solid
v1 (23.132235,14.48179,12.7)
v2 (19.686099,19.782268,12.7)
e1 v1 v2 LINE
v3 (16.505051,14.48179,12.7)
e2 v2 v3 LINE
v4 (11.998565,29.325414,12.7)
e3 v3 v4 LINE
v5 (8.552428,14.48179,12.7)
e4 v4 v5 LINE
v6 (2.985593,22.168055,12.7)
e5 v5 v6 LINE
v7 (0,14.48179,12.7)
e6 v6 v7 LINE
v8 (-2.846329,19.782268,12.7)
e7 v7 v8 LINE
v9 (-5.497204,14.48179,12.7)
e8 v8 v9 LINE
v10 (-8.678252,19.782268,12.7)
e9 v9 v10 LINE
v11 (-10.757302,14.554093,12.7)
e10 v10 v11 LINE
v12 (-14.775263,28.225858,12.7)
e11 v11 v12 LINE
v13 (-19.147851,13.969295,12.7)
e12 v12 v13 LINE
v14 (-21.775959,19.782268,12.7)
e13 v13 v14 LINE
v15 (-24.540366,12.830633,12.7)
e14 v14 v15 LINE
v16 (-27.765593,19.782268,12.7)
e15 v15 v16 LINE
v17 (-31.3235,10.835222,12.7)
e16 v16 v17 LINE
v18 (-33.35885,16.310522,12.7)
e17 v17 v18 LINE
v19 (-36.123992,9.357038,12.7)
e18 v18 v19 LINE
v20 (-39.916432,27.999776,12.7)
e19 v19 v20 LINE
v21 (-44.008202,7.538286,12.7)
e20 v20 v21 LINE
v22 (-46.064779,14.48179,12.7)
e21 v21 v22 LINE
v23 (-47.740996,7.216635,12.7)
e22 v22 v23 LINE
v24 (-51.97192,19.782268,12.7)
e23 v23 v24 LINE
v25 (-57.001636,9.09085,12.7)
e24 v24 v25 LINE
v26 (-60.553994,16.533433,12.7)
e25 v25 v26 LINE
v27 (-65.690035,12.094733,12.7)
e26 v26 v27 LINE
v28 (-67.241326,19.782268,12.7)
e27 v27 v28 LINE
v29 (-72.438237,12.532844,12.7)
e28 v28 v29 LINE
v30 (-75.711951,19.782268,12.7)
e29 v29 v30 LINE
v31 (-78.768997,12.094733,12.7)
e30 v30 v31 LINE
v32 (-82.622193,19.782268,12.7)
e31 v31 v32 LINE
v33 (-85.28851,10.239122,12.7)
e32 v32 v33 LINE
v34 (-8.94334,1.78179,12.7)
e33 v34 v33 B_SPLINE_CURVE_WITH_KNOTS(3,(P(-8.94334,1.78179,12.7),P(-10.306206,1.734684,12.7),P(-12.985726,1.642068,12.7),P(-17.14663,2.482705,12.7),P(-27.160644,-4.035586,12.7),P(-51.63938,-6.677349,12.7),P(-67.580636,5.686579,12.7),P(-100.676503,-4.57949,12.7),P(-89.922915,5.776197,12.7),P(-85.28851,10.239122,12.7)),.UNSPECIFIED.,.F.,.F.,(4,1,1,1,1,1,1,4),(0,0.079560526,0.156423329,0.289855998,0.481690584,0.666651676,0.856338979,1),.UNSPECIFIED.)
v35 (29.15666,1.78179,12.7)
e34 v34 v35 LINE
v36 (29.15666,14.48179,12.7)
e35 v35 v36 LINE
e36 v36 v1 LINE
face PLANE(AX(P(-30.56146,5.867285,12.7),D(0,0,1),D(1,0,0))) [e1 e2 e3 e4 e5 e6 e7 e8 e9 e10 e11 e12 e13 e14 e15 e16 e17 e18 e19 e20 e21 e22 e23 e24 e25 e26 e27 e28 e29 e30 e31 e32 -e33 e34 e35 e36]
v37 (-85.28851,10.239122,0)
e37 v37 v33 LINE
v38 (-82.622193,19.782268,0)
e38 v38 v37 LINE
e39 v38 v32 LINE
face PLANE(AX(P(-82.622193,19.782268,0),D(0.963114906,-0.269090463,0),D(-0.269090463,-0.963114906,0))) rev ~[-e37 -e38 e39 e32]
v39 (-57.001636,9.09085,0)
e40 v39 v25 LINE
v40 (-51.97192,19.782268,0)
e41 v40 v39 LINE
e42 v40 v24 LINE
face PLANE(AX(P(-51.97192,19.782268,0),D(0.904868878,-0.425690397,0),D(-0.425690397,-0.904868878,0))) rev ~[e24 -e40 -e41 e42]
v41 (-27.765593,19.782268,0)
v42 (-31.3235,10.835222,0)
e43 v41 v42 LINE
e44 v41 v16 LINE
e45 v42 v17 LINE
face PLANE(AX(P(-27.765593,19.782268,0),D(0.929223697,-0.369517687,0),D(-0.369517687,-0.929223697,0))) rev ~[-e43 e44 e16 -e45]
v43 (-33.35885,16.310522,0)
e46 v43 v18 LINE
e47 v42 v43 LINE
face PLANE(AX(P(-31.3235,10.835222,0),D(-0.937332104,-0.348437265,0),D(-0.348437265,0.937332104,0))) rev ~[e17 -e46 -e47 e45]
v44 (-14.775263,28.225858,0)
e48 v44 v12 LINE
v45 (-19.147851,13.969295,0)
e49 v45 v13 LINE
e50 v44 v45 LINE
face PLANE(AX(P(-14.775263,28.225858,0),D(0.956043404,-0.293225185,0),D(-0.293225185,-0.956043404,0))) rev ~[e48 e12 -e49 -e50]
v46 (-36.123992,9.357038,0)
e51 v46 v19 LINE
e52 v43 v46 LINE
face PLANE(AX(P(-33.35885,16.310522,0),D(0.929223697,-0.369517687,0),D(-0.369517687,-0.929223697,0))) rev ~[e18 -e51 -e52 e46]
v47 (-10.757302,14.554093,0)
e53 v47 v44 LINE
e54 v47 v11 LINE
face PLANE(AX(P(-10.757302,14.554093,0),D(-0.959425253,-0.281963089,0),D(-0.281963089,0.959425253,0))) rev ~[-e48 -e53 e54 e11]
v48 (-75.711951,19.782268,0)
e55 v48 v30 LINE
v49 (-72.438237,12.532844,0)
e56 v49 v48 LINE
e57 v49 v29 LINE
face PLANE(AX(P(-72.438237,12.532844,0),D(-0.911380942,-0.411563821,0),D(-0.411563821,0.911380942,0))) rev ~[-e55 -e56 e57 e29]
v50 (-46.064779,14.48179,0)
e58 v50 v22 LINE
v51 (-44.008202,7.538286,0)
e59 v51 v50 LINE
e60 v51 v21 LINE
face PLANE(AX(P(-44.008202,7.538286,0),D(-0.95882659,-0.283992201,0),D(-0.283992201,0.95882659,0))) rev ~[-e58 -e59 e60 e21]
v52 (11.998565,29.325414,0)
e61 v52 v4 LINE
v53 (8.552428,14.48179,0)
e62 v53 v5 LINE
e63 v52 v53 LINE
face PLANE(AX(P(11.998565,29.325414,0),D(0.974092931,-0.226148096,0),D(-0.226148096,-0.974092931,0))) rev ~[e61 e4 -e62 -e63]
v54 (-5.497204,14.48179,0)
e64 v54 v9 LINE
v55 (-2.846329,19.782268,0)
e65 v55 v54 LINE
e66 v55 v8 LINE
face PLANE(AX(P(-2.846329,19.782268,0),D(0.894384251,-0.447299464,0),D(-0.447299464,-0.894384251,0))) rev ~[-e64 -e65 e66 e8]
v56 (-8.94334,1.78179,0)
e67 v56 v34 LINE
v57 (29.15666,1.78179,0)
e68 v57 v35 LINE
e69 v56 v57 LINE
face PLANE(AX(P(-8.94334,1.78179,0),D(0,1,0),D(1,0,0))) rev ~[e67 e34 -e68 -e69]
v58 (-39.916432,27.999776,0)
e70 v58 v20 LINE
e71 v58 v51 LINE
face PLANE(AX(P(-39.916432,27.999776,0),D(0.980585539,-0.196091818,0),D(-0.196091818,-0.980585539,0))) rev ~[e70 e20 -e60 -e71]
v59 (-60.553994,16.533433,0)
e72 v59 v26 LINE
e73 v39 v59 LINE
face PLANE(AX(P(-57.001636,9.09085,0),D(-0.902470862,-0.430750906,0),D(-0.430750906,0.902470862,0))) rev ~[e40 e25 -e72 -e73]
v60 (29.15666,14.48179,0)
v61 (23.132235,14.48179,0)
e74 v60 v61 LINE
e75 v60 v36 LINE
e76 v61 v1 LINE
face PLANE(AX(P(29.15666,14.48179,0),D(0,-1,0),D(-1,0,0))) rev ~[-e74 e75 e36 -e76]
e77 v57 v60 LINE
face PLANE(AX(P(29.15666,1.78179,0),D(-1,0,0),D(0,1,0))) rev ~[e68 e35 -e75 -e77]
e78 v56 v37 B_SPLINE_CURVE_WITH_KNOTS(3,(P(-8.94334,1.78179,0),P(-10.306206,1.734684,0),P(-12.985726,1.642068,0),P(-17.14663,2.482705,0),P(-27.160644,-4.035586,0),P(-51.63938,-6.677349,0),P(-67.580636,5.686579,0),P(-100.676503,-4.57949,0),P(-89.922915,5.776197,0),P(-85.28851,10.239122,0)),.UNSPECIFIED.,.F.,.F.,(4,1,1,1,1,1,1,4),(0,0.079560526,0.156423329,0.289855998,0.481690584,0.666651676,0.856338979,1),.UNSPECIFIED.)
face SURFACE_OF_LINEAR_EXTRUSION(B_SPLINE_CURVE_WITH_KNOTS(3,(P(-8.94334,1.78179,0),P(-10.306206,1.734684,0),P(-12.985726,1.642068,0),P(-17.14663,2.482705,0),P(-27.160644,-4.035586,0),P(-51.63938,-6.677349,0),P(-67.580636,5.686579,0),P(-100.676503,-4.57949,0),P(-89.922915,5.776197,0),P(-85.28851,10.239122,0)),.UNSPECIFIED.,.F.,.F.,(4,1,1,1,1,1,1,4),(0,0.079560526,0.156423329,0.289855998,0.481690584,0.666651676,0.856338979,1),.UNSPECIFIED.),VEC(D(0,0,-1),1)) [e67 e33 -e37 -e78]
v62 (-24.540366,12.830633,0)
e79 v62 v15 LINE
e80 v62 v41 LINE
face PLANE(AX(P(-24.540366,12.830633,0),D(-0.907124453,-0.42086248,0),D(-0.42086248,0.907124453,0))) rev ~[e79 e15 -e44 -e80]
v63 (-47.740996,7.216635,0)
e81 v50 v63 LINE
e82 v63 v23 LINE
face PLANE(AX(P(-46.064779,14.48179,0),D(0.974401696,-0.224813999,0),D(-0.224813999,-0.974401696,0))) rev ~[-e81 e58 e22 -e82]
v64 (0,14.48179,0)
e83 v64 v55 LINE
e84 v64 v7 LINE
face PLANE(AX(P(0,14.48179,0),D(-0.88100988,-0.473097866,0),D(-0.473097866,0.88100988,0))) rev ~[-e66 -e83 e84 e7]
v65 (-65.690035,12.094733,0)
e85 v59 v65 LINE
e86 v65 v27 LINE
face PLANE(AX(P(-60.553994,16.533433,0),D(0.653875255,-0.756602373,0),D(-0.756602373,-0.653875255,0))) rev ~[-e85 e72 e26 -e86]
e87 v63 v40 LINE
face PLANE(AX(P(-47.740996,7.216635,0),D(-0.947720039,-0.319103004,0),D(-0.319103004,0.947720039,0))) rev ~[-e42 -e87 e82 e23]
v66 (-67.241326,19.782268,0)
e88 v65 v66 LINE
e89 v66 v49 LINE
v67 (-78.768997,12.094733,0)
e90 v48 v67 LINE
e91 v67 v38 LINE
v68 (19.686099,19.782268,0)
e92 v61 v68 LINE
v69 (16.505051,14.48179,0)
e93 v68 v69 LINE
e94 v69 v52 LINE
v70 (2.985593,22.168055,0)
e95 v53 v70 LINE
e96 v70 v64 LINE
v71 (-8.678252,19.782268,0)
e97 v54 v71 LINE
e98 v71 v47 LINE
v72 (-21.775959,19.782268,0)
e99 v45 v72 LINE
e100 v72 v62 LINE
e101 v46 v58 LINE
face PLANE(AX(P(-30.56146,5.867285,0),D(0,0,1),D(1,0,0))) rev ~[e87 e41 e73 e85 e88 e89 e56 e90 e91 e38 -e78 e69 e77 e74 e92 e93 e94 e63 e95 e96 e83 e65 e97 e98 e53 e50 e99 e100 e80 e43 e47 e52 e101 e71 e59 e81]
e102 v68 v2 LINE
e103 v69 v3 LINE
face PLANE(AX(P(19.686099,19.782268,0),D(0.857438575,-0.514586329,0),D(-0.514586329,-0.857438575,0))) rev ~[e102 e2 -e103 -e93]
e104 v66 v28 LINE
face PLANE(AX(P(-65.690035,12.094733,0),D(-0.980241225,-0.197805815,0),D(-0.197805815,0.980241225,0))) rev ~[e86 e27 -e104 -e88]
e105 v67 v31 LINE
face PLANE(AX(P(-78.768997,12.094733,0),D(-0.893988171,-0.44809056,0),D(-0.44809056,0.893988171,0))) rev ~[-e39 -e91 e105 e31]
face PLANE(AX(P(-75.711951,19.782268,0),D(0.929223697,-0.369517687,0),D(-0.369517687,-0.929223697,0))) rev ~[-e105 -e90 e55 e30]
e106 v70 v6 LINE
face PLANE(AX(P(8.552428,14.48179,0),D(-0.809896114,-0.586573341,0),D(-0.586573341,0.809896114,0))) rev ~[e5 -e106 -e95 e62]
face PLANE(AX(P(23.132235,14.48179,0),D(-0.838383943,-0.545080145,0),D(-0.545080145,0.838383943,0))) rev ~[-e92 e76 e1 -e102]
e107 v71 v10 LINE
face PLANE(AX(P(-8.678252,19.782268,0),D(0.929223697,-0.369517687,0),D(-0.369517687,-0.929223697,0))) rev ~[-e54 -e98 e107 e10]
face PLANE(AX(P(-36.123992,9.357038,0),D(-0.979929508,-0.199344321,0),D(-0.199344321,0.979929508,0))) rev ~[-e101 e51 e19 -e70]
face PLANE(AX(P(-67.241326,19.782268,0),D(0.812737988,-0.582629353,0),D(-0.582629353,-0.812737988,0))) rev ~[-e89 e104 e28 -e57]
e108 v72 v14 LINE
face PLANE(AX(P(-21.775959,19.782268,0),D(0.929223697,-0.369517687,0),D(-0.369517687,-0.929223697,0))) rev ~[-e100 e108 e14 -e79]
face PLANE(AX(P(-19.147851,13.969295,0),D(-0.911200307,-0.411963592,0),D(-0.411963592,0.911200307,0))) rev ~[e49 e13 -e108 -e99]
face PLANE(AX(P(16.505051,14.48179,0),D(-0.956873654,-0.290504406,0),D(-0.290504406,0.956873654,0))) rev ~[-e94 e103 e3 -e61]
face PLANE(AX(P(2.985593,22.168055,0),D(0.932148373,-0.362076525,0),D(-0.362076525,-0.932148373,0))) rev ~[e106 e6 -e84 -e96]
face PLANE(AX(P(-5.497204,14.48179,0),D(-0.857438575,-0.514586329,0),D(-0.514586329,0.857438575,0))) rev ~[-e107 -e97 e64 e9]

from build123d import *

# Parameters (mm, degrees)
F1_DEPTH = 12.7


# Not quite as in the source:
# - a feature names something its author has since deleted; it is built from what else it names


with BuildPart() as f1:
    # F0 (on Top) → F1 (new body)
    with BuildSketch(Plane.XY):
        with BuildLine():
            Line((29.1566601902, 1.7817904405), (29.1566601902, 14.4817904405))
            Line((29.1566601902, 14.4817904405), (23.1322348118, 14.4817904405))
            Line((23.1322348118, 14.4817904405), (16.5050514042, 14.4817904405))
            Line((16.5050514042, 14.4817904405), (8.552428335, 14.4817904405))
            Line((8.552428335, 14.4817904405), (0, 14.4817904405))
            Line((0, 14.4817904405), (-5.4972041398, 14.4817904405))
            Line((-5.4972041398, 14.4817904405), (-8.9433398098, 14.4817904405))
            add(Edge.make_bspline(
                [(-8.9433398098, 14.4817904405), (-10.7573023584, 14.5540929372), (-13.6536245903, 14.6695370673), (-17.5443018447, 14.2319983354), (-19.1478505954, 13.9692945078)],
                knots=[0, 0, 0, 0, 0.1219531365, 0.1947204372, 0.1947204372, 0.1947204372, 0.1947204372], degree=3))
            add(Edge.make_bspline(
                [(-19.1478505954, 13.9692945078), (-20.7855145388, 13.7010017066), (-22.5792086961, 13.3292483099), (-24.5403655562, 12.8306326712)],
                knots=[0.1947204372, 0.1947204372, 0.1947204372, 0.1947204372, 0.2690358483, 0.2690358483, 0.2690358483, 0.2690358483], degree=3))
            add(Edge.make_bspline(
                [(-24.5403655562, 12.8306326712), (-25.4054556528, 12.6106872606), (-27.5608275588, 12.0233152228), (-29.9097113738, 11.2820530364), (-31.3234997305, 10.8352217448)],
                knots=[0.2690358483, 0.2690358483, 0.2690358483, 0.2690358483, 0.3018172782, 0.3477460441, 0.3477460441, 0.3477460441, 0.3477460441], degree=3))
            add(Edge.make_bspline(
                [(-31.3234997305, 10.8352217448), (-32.8813721767, 10.3428523218), (-34.4916669077, 9.8331294404), (-36.1239915531, 9.3570380081)],
                knots=[0.3477460441, 0.3477460441, 0.3477460441, 0.3477460441, 0.3983555703, 0.3983555703, 0.3983555703, 0.3983555703], degree=3))
            add(Edge.make_bspline(
                [(-36.1239915531, 9.3570380081), (-38.7371673177, 8.5948669557), (-41.406802576, 7.9188884572), (-44.0082018162, 7.5382862352)],
                knots=[0.3983555703, 0.3983555703, 0.3983555703, 0.3983555703, 0.4793759651, 0.4793759651, 0.4793759651, 0.4793759651], degree=3))
            add(Edge.make_bspline(
                [(-44.0082018162, 7.5382862352), (-45.2733883847, 7.3531809228), (-46.5224347573, 7.2379423921), (-47.7409961664, 7.2166347961)],
                knots=[0.4793759651, 0.4793759651, 0.4793759651, 0.4793759651, 0.518780111, 0.518780111, 0.518780111, 0.518780111], degree=3))
            add(Edge.make_bspline(
                [(-47.7409961664, 7.2166347961), (-48.61023628, 7.2014353839), (-51.8736517816, 7.3260381182), (-54.8343256873, 8.2766625789), (-57.0016363215, 9.090849647)],
                knots=[0.518780111, 0.518780111, 0.518780111, 0.518780111, 0.5468883902, 0.6262253297, 0.6262253297, 0.6262253297, 0.6262253297], degree=3))
            add(Edge.make_bspline(
                [(-57.0016363215, 9.090849647), (-59.8222284032, 10.150452992), (-62.6109209229, 11.4001772385), (-65.6900354035, 12.0947333053)],
                knots=[0.6262253297, 0.6262253297, 0.6262253297, 0.6262253297, 0.7294764002, 0.7294764002, 0.7294764002, 0.7294764002], degree=3))
            add(Edge.make_bspline(
                [(-65.6900354035, 12.0947333053), (-67.0336130762, 12.397804214), (-69.2092078019, 12.7047556683), (-71.5833285763, 12.6062540598), (-72.4382368268, 12.5328440974)],
                knots=[0.7294764002, 0.7294764002, 0.7294764002, 0.7294764002, 0.7745302084, 0.7995461596, 0.7995461596, 0.7995461596, 0.7995461596], degree=3))
            add(Edge.make_bspline(
                [(-72.4382368268, 12.5328440974), (-78.4000977285, 12.0209061386), (-85.6590909795, 9.2956107983), (-85.3310582144, 10.1307918098), (-85.2885097265, 10.2391215041)],
                knots=[0.7995461596, 0.7995461596, 0.7995461596, 0.7995461596, 0.9739995247, 1, 1, 1, 1], degree=3))
            add(Edge.make_bspline(
                [(-8.9433398098, 1.7817904405), (-10.3062057468, 1.7346839959), (-12.9857258176, 1.6420683833), (-17.1466296289, 2.4827049446), (-27.1606442527, -4.0355858357), (-51.6393795509, -6.6773487114), (-67.5806364014, 5.6865791664), (-100.6765031612, -4.5794896544), (-89.9229154748, 5.7761967552), (-85.2885097265, 10.2391215041)],
                knots=[0, 0, 0, 0, 0.0795605261, 0.1564233287, 0.2898559981, 0.4816905838, 0.6666516763, 0.8563389789, 1, 1, 1, 1], degree=3))
            Line((-8.9433398098, 1.7817904405), (29.1566601902, 1.7817904405))
        make_face()
        with BuildLine():
            Line((-82.6221928, 19.7822675109), (-85.2885097265, 10.2391215041))
            add(Edge.make_bspline(
                [(-72.4382368268, 12.5328440974), (-78.4000977285, 12.0209061386), (-85.6590909795, 9.2956107983), (-85.3310582144, 10.1307918098), (-85.2885097265, 10.2391215041)],
                knots=[0.7995461596, 0.7995461596, 0.7995461596, 0.7995461596, 0.9739995247, 1, 1, 1, 1], degree=3))
            Line((-72.4382368268, 12.5328440974), (-75.7119506598, 19.7822675109))
            Line((-75.7119506598, 19.7822675109), (-78.7689969505, 12.0947333053))
            Line((-78.7689969505, 12.0947333053), (-82.6221928, 19.7822675109))
        make_face()
        with BuildLine():
            Line((-67.2413259745, 19.7822675109), (-72.4382368268, 12.5328440974))
            add(Edge.make_bspline(
                [(-65.6900354035, 12.0947333053), (-67.0336130762, 12.397804214), (-69.2092078019, 12.7047556683), (-71.5833285763, 12.6062540598), (-72.4382368268, 12.5328440974)],
                knots=[0.7294764002, 0.7294764002, 0.7294764002, 0.7294764002, 0.7745302084, 0.7995461596, 0.7995461596, 0.7995461596, 0.7995461596], degree=3))
            Line((-65.6900354035, 12.0947333053), (-67.2413259745, 19.7822675109))
        make_face()
        with BuildLine():
            Line((-51.9719198346, 19.7822675109), (-57.0016363215, 9.090849647))
            add(Edge.make_bspline(
                [(-47.7409961664, 7.2166347961), (-48.61023628, 7.2014353839), (-51.8736517816, 7.3260381182), (-54.8343256873, 8.2766625789), (-57.0016363215, 9.090849647)],
                knots=[0.518780111, 0.518780111, 0.518780111, 0.518780111, 0.5468883902, 0.6262253297, 0.6262253297, 0.6262253297, 0.6262253297], degree=3))
            Line((-47.7409961664, 7.2166347961), (-51.9719198346, 19.7822675109))
        make_face()
        with BuildLine():
            Line((-46.0647791624, 14.4817904405), (-47.7409961664, 7.2166347961))
            add(Edge.make_bspline(
                [(-44.0082018162, 7.5382862352), (-45.2733883847, 7.3531809228), (-46.5224347573, 7.2379423921), (-47.7409961664, 7.2166347961)],
                knots=[0.4793759651, 0.4793759651, 0.4793759651, 0.4793759651, 0.518780111, 0.518780111, 0.518780111, 0.518780111], degree=3))
            Line((-44.0082018162, 7.5382862352), (-46.0647791624, 14.4817904405))
        make_face()
        with BuildLine():
            Line((-39.9164316104, 27.9997758427), (-44.0082018162, 7.5382862352))
            add(Edge.make_bspline(
                [(-36.1239915531, 9.3570380081), (-38.7371673177, 8.5948669557), (-41.406802576, 7.9188884572), (-44.0082018162, 7.5382862352)],
                knots=[0.3983555703, 0.3983555703, 0.3983555703, 0.3983555703, 0.4793759651, 0.4793759651, 0.4793759651, 0.4793759651], degree=3))
            Line((-36.1239915531, 9.3570380081), (-39.9164316104, 27.9997758427))
        make_face()
        with BuildLine():
            Line((-33.3588495851, 16.3105223328), (-36.1239915531, 9.3570380081))
            add(Edge.make_bspline(
                [(-31.3234997305, 10.8352217448), (-32.8813721767, 10.3428523218), (-34.4916669077, 9.8331294404), (-36.1239915531, 9.3570380081)],
                knots=[0.3477460441, 0.3477460441, 0.3477460441, 0.3477460441, 0.3983555703, 0.3983555703, 0.3983555703, 0.3983555703], degree=3))
            Line((-31.3234997305, 10.8352217448), (-33.3588495851, 16.3105223328))
        make_face()
        with BuildLine():
            add(Edge.make_bspline(
                [(-24.5403655562, 12.8306326712), (-25.4054556528, 12.6106872606), (-27.5608275588, 12.0233152228), (-29.9097113738, 11.2820530364), (-31.3234997305, 10.8352217448)],
                knots=[0.2690358483, 0.2690358483, 0.2690358483, 0.2690358483, 0.3018172782, 0.3477460441, 0.3477460441, 0.3477460441, 0.3477460441], degree=3))
            Line((-24.5403655562, 12.8306326712), (-27.7655925602, 19.7822675109))
            Line((-27.7655925602, 19.7822675109), (-31.3234997305, 10.8352217448))
        make_face()
        with BuildLine():
            add(Edge.make_bspline(
                [(-19.1478505954, 13.9692945078), (-20.7855145388, 13.7010017066), (-22.5792086961, 13.3292483099), (-24.5403655562, 12.8306326712)],
                knots=[0.1947204372, 0.1947204372, 0.1947204372, 0.1947204372, 0.2690358483, 0.2690358483, 0.2690358483, 0.2690358483], degree=3))
            Line((-19.1478505954, 13.9692945078), (-21.7759590596, 19.7822675109))
            Line((-21.7759590596, 19.7822675109), (-24.5403655562, 12.8306326712))
        make_face()
        Polygon((-5.4972041398, 14.4817904405), (0, 14.4817904405), (-2.846329473, 19.7822675109), align=None)
        Polygon((0, 14.4817904405), (8.552428335, 14.4817904405), (2.9855933972, 22.1680551767), align=None)
        Polygon((8.552428335, 14.4817904405), (16.5050514042, 14.4817904405), (11.9985649362, 29.325414449), align=None)
        Polygon((16.5050514042, 14.4817904405), (23.1322348118, 14.4817904405), (19.6860991418, 19.7822675109), align=None)
        with BuildLine():
            Line((-8.9433398098, 14.4817904405), (-5.4972041398, 14.4817904405))
            Line((-5.4972041398, 14.4817904405), (-8.6782518774, 19.7822675109))
            Line((-8.6782518774, 19.7822675109), (-10.7573023584, 14.5540929372))
            Line((-10.7573023584, 14.5540929372), (-14.7752631456, 28.2258577645))
            Line((-14.7752631456, 28.2258577645), (-19.1478505954, 13.9692945078))
            add(Edge.make_bspline(
                [(-8.9433398098, 14.4817904405), (-10.7573023584, 14.5540929372), (-13.6536245903, 14.6695370673), (-17.5443018447, 14.2319983354), (-19.1478505954, 13.9692945078)],
                knots=[0, 0, 0, 0, 0.1219531365, 0.1947204372, 0.1947204372, 0.1947204372, 0.1947204372], degree=3))
        make_face()
        with BuildLine():
            Line((-60.5539940298, 16.5334325284), (-65.6900354035, 12.0947333053))
            add(Edge.make_bspline(
                [(-57.0016363215, 9.090849647), (-59.8222284032, 10.150452992), (-62.6109209229, 11.4001772385), (-65.6900354035, 12.0947333053)],
                knots=[0.6262253297, 0.6262253297, 0.6262253297, 0.6262253297, 0.7294764002, 0.7294764002, 0.7294764002, 0.7294764002], degree=3))
            Line((-57.0016363215, 9.090849647), (-60.5539940298, 16.5334325284))
        make_face()
    extrude(amount=F1_DEPTH)


solid = f1.part
